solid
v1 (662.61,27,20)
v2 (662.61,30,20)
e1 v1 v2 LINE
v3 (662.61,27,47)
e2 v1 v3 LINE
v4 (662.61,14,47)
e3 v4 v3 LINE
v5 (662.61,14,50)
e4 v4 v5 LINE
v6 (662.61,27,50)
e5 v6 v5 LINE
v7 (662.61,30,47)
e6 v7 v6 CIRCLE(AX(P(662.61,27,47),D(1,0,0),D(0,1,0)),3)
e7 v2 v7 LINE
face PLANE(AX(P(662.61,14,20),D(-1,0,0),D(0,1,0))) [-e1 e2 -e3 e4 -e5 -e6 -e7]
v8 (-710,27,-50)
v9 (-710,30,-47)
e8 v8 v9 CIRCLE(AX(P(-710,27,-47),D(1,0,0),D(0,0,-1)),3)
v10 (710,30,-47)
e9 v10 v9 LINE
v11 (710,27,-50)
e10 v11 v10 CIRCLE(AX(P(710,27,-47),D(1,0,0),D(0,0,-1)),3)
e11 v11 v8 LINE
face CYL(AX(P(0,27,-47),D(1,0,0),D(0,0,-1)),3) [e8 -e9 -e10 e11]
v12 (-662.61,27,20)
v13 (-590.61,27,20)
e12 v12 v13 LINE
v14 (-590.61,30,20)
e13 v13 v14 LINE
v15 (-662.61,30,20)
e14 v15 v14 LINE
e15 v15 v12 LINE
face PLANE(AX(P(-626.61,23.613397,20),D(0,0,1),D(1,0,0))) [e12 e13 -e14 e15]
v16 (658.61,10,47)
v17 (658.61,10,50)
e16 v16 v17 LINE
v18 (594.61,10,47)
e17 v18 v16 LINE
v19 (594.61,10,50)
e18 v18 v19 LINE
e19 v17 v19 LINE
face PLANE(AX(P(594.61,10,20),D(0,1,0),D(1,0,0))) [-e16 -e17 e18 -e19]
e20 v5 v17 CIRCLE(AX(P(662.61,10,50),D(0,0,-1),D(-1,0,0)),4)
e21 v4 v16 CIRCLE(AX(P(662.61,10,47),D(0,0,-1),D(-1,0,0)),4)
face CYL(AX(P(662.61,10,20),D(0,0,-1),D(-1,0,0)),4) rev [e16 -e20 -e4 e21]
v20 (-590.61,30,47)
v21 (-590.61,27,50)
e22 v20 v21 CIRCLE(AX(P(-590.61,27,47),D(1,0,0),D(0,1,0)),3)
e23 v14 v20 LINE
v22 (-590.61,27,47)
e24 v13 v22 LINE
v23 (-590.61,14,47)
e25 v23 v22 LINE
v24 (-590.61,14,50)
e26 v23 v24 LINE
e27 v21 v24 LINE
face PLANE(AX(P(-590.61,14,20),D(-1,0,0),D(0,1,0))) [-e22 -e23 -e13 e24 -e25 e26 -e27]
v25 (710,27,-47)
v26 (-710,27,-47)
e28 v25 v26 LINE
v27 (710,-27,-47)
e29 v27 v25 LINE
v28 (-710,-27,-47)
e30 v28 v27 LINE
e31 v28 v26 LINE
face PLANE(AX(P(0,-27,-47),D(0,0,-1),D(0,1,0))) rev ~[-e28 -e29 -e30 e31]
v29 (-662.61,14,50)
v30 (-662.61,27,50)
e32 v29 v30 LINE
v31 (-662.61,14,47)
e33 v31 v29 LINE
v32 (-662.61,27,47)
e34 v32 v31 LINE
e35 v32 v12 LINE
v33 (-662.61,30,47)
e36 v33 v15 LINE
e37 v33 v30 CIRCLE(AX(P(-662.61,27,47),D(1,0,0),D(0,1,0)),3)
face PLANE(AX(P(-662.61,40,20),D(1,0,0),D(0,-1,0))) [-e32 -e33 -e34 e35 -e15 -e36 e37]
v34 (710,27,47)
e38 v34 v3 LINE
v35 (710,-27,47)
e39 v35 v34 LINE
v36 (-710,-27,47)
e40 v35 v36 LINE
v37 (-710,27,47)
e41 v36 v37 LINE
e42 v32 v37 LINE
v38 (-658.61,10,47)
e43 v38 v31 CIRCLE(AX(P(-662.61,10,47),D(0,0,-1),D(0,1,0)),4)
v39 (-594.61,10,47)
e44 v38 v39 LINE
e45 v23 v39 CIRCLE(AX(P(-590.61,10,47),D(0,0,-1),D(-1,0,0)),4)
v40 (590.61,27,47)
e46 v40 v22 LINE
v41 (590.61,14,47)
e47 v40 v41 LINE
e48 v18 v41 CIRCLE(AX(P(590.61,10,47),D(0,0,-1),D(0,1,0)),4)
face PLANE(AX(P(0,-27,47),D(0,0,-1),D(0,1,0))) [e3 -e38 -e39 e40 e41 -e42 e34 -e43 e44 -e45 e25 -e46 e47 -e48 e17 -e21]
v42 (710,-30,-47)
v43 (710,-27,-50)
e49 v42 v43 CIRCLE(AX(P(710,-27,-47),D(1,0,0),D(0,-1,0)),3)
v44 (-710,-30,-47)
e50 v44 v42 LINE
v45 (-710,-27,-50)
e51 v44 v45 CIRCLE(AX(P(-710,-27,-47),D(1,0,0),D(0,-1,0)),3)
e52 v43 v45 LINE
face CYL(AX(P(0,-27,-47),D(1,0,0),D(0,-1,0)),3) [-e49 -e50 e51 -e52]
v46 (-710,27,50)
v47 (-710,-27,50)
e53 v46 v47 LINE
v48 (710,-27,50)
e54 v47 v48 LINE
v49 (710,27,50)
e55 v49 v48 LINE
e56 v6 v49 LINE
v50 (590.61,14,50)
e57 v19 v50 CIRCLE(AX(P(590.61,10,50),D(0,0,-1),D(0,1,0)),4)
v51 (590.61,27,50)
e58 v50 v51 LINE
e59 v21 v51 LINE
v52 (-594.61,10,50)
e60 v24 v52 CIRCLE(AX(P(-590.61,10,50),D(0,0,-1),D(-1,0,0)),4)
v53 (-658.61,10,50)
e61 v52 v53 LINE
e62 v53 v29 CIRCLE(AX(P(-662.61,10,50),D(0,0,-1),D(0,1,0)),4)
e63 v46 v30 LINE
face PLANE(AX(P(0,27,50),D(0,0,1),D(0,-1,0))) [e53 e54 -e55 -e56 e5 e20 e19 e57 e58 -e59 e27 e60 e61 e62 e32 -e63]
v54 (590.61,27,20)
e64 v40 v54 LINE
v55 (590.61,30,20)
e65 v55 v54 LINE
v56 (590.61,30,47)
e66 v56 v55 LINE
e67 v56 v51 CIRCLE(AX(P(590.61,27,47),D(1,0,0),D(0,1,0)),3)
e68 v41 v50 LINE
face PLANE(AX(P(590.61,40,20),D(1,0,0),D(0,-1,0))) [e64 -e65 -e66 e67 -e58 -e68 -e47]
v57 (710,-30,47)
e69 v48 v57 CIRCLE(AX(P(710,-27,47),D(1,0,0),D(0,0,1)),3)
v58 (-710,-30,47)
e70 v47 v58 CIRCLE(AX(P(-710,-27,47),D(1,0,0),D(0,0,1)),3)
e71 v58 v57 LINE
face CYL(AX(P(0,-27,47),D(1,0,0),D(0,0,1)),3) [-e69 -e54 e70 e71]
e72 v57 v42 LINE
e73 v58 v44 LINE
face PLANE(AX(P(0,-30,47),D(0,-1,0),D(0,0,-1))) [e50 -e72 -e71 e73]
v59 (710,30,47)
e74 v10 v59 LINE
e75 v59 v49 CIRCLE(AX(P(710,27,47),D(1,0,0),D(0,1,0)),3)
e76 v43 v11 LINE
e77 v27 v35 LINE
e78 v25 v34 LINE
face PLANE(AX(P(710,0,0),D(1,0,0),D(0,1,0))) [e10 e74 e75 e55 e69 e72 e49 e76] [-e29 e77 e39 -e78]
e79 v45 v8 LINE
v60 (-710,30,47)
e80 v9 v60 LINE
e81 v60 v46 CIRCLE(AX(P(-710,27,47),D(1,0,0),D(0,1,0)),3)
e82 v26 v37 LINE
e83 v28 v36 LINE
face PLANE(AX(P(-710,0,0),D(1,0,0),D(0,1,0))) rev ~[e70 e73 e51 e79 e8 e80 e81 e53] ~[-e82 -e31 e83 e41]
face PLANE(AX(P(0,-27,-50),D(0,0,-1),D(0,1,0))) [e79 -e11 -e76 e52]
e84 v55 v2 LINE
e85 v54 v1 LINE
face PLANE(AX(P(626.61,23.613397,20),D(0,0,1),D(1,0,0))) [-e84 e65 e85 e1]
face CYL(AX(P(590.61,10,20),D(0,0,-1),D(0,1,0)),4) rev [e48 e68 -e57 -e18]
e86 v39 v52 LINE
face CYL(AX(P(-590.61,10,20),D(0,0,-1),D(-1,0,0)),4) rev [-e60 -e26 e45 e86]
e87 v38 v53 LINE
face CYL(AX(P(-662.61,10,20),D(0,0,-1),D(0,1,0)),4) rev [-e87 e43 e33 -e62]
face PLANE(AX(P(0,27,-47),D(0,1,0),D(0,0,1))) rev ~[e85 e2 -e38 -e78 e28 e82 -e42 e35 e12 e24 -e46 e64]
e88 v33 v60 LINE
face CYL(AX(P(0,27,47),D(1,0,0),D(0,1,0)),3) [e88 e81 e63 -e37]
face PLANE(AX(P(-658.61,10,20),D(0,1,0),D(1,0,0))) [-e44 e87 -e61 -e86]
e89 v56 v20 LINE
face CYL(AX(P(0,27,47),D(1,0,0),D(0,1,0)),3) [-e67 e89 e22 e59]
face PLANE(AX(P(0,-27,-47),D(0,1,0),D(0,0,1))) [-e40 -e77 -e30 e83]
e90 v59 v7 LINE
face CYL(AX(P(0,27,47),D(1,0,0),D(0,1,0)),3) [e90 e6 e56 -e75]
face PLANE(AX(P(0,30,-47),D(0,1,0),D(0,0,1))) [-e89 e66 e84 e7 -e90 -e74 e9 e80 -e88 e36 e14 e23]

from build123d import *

# Parameters (mm, degrees)
F0_W     = 54
F0_H     = 94
F1_DEPTH = 710
F3_START = 20
F3_DEPTH = 35
F4_START = 20
F4_DEPTH = 35


with BuildPart() as f1:
    # F0 (on Right) → F1 (new body, symmetric)
    with BuildSketch(Plane.YZ):
        with BuildLine():
            ThreePointArc((30, 47), (29.1213203436, 49.1213203436), (27, 50))
            Line((27, 50), (-27, 50))
            ThreePointArc((-27, 50), (-29.1213203436, 49.1213203436), (-30, 47))
            Line((-30, 47), (-30, -47))
            ThreePointArc((-30, -47), (-29.1213203436, -49.1213203436), (-27, -50))
            Line((-27, -50), (27, -50))
            ThreePointArc((27, -50), (29.1213203436, -49.1213203436), (30, -47))
            Line((30, -47), (30, 47))
        make_face()
        Rectangle(F0_W, F0_H, mode=Mode.SUBTRACT)
    extrude(amount=F1_DEPTH, both=True)

    # F2 (on Top) → F3 (cut)
    with BuildSketch(Plane.XY.offset(F3_START)):
        with BuildLine():
            Line((-590.61, 40), (-662.61, 40))
            Line((-662.61, 40), (-662.61, 14))
            ThreePointArc((-662.61, 14), (-665.4384271247, 7.1715728753), (-658.61, 10))
            Line((-658.61, 10), (-594.61, 10))
            ThreePointArc((-594.61, 10), (-587.7815728753, 7.1715728753), (-590.61, 14))
            Line((-590.61, 14), (-590.61, 40))
        make_face()
    extrude(amount=F3_DEPTH, mode=Mode.SUBTRACT)

    # F2 (on Top) → F4 (cut)
    with BuildSketch(Plane.XY.offset(F4_START)):
        with BuildLine():
            Line((662.61, 14), (662.61, 40))
            Line((662.61, 40), (590.61, 40))
            Line((590.61, 40), (590.61, 14))
            ThreePointArc((590.61, 14), (587.7815728753, 7.1715728753), (594.61, 10))
            Line((594.61, 10), (658.61, 10))
            ThreePointArc((658.61, 10), (665.4384271247, 7.1715728753), (662.61, 14))
        make_face()
    extrude(amount=F4_DEPTH, mode=Mode.SUBTRACT)


solid = f1.part
